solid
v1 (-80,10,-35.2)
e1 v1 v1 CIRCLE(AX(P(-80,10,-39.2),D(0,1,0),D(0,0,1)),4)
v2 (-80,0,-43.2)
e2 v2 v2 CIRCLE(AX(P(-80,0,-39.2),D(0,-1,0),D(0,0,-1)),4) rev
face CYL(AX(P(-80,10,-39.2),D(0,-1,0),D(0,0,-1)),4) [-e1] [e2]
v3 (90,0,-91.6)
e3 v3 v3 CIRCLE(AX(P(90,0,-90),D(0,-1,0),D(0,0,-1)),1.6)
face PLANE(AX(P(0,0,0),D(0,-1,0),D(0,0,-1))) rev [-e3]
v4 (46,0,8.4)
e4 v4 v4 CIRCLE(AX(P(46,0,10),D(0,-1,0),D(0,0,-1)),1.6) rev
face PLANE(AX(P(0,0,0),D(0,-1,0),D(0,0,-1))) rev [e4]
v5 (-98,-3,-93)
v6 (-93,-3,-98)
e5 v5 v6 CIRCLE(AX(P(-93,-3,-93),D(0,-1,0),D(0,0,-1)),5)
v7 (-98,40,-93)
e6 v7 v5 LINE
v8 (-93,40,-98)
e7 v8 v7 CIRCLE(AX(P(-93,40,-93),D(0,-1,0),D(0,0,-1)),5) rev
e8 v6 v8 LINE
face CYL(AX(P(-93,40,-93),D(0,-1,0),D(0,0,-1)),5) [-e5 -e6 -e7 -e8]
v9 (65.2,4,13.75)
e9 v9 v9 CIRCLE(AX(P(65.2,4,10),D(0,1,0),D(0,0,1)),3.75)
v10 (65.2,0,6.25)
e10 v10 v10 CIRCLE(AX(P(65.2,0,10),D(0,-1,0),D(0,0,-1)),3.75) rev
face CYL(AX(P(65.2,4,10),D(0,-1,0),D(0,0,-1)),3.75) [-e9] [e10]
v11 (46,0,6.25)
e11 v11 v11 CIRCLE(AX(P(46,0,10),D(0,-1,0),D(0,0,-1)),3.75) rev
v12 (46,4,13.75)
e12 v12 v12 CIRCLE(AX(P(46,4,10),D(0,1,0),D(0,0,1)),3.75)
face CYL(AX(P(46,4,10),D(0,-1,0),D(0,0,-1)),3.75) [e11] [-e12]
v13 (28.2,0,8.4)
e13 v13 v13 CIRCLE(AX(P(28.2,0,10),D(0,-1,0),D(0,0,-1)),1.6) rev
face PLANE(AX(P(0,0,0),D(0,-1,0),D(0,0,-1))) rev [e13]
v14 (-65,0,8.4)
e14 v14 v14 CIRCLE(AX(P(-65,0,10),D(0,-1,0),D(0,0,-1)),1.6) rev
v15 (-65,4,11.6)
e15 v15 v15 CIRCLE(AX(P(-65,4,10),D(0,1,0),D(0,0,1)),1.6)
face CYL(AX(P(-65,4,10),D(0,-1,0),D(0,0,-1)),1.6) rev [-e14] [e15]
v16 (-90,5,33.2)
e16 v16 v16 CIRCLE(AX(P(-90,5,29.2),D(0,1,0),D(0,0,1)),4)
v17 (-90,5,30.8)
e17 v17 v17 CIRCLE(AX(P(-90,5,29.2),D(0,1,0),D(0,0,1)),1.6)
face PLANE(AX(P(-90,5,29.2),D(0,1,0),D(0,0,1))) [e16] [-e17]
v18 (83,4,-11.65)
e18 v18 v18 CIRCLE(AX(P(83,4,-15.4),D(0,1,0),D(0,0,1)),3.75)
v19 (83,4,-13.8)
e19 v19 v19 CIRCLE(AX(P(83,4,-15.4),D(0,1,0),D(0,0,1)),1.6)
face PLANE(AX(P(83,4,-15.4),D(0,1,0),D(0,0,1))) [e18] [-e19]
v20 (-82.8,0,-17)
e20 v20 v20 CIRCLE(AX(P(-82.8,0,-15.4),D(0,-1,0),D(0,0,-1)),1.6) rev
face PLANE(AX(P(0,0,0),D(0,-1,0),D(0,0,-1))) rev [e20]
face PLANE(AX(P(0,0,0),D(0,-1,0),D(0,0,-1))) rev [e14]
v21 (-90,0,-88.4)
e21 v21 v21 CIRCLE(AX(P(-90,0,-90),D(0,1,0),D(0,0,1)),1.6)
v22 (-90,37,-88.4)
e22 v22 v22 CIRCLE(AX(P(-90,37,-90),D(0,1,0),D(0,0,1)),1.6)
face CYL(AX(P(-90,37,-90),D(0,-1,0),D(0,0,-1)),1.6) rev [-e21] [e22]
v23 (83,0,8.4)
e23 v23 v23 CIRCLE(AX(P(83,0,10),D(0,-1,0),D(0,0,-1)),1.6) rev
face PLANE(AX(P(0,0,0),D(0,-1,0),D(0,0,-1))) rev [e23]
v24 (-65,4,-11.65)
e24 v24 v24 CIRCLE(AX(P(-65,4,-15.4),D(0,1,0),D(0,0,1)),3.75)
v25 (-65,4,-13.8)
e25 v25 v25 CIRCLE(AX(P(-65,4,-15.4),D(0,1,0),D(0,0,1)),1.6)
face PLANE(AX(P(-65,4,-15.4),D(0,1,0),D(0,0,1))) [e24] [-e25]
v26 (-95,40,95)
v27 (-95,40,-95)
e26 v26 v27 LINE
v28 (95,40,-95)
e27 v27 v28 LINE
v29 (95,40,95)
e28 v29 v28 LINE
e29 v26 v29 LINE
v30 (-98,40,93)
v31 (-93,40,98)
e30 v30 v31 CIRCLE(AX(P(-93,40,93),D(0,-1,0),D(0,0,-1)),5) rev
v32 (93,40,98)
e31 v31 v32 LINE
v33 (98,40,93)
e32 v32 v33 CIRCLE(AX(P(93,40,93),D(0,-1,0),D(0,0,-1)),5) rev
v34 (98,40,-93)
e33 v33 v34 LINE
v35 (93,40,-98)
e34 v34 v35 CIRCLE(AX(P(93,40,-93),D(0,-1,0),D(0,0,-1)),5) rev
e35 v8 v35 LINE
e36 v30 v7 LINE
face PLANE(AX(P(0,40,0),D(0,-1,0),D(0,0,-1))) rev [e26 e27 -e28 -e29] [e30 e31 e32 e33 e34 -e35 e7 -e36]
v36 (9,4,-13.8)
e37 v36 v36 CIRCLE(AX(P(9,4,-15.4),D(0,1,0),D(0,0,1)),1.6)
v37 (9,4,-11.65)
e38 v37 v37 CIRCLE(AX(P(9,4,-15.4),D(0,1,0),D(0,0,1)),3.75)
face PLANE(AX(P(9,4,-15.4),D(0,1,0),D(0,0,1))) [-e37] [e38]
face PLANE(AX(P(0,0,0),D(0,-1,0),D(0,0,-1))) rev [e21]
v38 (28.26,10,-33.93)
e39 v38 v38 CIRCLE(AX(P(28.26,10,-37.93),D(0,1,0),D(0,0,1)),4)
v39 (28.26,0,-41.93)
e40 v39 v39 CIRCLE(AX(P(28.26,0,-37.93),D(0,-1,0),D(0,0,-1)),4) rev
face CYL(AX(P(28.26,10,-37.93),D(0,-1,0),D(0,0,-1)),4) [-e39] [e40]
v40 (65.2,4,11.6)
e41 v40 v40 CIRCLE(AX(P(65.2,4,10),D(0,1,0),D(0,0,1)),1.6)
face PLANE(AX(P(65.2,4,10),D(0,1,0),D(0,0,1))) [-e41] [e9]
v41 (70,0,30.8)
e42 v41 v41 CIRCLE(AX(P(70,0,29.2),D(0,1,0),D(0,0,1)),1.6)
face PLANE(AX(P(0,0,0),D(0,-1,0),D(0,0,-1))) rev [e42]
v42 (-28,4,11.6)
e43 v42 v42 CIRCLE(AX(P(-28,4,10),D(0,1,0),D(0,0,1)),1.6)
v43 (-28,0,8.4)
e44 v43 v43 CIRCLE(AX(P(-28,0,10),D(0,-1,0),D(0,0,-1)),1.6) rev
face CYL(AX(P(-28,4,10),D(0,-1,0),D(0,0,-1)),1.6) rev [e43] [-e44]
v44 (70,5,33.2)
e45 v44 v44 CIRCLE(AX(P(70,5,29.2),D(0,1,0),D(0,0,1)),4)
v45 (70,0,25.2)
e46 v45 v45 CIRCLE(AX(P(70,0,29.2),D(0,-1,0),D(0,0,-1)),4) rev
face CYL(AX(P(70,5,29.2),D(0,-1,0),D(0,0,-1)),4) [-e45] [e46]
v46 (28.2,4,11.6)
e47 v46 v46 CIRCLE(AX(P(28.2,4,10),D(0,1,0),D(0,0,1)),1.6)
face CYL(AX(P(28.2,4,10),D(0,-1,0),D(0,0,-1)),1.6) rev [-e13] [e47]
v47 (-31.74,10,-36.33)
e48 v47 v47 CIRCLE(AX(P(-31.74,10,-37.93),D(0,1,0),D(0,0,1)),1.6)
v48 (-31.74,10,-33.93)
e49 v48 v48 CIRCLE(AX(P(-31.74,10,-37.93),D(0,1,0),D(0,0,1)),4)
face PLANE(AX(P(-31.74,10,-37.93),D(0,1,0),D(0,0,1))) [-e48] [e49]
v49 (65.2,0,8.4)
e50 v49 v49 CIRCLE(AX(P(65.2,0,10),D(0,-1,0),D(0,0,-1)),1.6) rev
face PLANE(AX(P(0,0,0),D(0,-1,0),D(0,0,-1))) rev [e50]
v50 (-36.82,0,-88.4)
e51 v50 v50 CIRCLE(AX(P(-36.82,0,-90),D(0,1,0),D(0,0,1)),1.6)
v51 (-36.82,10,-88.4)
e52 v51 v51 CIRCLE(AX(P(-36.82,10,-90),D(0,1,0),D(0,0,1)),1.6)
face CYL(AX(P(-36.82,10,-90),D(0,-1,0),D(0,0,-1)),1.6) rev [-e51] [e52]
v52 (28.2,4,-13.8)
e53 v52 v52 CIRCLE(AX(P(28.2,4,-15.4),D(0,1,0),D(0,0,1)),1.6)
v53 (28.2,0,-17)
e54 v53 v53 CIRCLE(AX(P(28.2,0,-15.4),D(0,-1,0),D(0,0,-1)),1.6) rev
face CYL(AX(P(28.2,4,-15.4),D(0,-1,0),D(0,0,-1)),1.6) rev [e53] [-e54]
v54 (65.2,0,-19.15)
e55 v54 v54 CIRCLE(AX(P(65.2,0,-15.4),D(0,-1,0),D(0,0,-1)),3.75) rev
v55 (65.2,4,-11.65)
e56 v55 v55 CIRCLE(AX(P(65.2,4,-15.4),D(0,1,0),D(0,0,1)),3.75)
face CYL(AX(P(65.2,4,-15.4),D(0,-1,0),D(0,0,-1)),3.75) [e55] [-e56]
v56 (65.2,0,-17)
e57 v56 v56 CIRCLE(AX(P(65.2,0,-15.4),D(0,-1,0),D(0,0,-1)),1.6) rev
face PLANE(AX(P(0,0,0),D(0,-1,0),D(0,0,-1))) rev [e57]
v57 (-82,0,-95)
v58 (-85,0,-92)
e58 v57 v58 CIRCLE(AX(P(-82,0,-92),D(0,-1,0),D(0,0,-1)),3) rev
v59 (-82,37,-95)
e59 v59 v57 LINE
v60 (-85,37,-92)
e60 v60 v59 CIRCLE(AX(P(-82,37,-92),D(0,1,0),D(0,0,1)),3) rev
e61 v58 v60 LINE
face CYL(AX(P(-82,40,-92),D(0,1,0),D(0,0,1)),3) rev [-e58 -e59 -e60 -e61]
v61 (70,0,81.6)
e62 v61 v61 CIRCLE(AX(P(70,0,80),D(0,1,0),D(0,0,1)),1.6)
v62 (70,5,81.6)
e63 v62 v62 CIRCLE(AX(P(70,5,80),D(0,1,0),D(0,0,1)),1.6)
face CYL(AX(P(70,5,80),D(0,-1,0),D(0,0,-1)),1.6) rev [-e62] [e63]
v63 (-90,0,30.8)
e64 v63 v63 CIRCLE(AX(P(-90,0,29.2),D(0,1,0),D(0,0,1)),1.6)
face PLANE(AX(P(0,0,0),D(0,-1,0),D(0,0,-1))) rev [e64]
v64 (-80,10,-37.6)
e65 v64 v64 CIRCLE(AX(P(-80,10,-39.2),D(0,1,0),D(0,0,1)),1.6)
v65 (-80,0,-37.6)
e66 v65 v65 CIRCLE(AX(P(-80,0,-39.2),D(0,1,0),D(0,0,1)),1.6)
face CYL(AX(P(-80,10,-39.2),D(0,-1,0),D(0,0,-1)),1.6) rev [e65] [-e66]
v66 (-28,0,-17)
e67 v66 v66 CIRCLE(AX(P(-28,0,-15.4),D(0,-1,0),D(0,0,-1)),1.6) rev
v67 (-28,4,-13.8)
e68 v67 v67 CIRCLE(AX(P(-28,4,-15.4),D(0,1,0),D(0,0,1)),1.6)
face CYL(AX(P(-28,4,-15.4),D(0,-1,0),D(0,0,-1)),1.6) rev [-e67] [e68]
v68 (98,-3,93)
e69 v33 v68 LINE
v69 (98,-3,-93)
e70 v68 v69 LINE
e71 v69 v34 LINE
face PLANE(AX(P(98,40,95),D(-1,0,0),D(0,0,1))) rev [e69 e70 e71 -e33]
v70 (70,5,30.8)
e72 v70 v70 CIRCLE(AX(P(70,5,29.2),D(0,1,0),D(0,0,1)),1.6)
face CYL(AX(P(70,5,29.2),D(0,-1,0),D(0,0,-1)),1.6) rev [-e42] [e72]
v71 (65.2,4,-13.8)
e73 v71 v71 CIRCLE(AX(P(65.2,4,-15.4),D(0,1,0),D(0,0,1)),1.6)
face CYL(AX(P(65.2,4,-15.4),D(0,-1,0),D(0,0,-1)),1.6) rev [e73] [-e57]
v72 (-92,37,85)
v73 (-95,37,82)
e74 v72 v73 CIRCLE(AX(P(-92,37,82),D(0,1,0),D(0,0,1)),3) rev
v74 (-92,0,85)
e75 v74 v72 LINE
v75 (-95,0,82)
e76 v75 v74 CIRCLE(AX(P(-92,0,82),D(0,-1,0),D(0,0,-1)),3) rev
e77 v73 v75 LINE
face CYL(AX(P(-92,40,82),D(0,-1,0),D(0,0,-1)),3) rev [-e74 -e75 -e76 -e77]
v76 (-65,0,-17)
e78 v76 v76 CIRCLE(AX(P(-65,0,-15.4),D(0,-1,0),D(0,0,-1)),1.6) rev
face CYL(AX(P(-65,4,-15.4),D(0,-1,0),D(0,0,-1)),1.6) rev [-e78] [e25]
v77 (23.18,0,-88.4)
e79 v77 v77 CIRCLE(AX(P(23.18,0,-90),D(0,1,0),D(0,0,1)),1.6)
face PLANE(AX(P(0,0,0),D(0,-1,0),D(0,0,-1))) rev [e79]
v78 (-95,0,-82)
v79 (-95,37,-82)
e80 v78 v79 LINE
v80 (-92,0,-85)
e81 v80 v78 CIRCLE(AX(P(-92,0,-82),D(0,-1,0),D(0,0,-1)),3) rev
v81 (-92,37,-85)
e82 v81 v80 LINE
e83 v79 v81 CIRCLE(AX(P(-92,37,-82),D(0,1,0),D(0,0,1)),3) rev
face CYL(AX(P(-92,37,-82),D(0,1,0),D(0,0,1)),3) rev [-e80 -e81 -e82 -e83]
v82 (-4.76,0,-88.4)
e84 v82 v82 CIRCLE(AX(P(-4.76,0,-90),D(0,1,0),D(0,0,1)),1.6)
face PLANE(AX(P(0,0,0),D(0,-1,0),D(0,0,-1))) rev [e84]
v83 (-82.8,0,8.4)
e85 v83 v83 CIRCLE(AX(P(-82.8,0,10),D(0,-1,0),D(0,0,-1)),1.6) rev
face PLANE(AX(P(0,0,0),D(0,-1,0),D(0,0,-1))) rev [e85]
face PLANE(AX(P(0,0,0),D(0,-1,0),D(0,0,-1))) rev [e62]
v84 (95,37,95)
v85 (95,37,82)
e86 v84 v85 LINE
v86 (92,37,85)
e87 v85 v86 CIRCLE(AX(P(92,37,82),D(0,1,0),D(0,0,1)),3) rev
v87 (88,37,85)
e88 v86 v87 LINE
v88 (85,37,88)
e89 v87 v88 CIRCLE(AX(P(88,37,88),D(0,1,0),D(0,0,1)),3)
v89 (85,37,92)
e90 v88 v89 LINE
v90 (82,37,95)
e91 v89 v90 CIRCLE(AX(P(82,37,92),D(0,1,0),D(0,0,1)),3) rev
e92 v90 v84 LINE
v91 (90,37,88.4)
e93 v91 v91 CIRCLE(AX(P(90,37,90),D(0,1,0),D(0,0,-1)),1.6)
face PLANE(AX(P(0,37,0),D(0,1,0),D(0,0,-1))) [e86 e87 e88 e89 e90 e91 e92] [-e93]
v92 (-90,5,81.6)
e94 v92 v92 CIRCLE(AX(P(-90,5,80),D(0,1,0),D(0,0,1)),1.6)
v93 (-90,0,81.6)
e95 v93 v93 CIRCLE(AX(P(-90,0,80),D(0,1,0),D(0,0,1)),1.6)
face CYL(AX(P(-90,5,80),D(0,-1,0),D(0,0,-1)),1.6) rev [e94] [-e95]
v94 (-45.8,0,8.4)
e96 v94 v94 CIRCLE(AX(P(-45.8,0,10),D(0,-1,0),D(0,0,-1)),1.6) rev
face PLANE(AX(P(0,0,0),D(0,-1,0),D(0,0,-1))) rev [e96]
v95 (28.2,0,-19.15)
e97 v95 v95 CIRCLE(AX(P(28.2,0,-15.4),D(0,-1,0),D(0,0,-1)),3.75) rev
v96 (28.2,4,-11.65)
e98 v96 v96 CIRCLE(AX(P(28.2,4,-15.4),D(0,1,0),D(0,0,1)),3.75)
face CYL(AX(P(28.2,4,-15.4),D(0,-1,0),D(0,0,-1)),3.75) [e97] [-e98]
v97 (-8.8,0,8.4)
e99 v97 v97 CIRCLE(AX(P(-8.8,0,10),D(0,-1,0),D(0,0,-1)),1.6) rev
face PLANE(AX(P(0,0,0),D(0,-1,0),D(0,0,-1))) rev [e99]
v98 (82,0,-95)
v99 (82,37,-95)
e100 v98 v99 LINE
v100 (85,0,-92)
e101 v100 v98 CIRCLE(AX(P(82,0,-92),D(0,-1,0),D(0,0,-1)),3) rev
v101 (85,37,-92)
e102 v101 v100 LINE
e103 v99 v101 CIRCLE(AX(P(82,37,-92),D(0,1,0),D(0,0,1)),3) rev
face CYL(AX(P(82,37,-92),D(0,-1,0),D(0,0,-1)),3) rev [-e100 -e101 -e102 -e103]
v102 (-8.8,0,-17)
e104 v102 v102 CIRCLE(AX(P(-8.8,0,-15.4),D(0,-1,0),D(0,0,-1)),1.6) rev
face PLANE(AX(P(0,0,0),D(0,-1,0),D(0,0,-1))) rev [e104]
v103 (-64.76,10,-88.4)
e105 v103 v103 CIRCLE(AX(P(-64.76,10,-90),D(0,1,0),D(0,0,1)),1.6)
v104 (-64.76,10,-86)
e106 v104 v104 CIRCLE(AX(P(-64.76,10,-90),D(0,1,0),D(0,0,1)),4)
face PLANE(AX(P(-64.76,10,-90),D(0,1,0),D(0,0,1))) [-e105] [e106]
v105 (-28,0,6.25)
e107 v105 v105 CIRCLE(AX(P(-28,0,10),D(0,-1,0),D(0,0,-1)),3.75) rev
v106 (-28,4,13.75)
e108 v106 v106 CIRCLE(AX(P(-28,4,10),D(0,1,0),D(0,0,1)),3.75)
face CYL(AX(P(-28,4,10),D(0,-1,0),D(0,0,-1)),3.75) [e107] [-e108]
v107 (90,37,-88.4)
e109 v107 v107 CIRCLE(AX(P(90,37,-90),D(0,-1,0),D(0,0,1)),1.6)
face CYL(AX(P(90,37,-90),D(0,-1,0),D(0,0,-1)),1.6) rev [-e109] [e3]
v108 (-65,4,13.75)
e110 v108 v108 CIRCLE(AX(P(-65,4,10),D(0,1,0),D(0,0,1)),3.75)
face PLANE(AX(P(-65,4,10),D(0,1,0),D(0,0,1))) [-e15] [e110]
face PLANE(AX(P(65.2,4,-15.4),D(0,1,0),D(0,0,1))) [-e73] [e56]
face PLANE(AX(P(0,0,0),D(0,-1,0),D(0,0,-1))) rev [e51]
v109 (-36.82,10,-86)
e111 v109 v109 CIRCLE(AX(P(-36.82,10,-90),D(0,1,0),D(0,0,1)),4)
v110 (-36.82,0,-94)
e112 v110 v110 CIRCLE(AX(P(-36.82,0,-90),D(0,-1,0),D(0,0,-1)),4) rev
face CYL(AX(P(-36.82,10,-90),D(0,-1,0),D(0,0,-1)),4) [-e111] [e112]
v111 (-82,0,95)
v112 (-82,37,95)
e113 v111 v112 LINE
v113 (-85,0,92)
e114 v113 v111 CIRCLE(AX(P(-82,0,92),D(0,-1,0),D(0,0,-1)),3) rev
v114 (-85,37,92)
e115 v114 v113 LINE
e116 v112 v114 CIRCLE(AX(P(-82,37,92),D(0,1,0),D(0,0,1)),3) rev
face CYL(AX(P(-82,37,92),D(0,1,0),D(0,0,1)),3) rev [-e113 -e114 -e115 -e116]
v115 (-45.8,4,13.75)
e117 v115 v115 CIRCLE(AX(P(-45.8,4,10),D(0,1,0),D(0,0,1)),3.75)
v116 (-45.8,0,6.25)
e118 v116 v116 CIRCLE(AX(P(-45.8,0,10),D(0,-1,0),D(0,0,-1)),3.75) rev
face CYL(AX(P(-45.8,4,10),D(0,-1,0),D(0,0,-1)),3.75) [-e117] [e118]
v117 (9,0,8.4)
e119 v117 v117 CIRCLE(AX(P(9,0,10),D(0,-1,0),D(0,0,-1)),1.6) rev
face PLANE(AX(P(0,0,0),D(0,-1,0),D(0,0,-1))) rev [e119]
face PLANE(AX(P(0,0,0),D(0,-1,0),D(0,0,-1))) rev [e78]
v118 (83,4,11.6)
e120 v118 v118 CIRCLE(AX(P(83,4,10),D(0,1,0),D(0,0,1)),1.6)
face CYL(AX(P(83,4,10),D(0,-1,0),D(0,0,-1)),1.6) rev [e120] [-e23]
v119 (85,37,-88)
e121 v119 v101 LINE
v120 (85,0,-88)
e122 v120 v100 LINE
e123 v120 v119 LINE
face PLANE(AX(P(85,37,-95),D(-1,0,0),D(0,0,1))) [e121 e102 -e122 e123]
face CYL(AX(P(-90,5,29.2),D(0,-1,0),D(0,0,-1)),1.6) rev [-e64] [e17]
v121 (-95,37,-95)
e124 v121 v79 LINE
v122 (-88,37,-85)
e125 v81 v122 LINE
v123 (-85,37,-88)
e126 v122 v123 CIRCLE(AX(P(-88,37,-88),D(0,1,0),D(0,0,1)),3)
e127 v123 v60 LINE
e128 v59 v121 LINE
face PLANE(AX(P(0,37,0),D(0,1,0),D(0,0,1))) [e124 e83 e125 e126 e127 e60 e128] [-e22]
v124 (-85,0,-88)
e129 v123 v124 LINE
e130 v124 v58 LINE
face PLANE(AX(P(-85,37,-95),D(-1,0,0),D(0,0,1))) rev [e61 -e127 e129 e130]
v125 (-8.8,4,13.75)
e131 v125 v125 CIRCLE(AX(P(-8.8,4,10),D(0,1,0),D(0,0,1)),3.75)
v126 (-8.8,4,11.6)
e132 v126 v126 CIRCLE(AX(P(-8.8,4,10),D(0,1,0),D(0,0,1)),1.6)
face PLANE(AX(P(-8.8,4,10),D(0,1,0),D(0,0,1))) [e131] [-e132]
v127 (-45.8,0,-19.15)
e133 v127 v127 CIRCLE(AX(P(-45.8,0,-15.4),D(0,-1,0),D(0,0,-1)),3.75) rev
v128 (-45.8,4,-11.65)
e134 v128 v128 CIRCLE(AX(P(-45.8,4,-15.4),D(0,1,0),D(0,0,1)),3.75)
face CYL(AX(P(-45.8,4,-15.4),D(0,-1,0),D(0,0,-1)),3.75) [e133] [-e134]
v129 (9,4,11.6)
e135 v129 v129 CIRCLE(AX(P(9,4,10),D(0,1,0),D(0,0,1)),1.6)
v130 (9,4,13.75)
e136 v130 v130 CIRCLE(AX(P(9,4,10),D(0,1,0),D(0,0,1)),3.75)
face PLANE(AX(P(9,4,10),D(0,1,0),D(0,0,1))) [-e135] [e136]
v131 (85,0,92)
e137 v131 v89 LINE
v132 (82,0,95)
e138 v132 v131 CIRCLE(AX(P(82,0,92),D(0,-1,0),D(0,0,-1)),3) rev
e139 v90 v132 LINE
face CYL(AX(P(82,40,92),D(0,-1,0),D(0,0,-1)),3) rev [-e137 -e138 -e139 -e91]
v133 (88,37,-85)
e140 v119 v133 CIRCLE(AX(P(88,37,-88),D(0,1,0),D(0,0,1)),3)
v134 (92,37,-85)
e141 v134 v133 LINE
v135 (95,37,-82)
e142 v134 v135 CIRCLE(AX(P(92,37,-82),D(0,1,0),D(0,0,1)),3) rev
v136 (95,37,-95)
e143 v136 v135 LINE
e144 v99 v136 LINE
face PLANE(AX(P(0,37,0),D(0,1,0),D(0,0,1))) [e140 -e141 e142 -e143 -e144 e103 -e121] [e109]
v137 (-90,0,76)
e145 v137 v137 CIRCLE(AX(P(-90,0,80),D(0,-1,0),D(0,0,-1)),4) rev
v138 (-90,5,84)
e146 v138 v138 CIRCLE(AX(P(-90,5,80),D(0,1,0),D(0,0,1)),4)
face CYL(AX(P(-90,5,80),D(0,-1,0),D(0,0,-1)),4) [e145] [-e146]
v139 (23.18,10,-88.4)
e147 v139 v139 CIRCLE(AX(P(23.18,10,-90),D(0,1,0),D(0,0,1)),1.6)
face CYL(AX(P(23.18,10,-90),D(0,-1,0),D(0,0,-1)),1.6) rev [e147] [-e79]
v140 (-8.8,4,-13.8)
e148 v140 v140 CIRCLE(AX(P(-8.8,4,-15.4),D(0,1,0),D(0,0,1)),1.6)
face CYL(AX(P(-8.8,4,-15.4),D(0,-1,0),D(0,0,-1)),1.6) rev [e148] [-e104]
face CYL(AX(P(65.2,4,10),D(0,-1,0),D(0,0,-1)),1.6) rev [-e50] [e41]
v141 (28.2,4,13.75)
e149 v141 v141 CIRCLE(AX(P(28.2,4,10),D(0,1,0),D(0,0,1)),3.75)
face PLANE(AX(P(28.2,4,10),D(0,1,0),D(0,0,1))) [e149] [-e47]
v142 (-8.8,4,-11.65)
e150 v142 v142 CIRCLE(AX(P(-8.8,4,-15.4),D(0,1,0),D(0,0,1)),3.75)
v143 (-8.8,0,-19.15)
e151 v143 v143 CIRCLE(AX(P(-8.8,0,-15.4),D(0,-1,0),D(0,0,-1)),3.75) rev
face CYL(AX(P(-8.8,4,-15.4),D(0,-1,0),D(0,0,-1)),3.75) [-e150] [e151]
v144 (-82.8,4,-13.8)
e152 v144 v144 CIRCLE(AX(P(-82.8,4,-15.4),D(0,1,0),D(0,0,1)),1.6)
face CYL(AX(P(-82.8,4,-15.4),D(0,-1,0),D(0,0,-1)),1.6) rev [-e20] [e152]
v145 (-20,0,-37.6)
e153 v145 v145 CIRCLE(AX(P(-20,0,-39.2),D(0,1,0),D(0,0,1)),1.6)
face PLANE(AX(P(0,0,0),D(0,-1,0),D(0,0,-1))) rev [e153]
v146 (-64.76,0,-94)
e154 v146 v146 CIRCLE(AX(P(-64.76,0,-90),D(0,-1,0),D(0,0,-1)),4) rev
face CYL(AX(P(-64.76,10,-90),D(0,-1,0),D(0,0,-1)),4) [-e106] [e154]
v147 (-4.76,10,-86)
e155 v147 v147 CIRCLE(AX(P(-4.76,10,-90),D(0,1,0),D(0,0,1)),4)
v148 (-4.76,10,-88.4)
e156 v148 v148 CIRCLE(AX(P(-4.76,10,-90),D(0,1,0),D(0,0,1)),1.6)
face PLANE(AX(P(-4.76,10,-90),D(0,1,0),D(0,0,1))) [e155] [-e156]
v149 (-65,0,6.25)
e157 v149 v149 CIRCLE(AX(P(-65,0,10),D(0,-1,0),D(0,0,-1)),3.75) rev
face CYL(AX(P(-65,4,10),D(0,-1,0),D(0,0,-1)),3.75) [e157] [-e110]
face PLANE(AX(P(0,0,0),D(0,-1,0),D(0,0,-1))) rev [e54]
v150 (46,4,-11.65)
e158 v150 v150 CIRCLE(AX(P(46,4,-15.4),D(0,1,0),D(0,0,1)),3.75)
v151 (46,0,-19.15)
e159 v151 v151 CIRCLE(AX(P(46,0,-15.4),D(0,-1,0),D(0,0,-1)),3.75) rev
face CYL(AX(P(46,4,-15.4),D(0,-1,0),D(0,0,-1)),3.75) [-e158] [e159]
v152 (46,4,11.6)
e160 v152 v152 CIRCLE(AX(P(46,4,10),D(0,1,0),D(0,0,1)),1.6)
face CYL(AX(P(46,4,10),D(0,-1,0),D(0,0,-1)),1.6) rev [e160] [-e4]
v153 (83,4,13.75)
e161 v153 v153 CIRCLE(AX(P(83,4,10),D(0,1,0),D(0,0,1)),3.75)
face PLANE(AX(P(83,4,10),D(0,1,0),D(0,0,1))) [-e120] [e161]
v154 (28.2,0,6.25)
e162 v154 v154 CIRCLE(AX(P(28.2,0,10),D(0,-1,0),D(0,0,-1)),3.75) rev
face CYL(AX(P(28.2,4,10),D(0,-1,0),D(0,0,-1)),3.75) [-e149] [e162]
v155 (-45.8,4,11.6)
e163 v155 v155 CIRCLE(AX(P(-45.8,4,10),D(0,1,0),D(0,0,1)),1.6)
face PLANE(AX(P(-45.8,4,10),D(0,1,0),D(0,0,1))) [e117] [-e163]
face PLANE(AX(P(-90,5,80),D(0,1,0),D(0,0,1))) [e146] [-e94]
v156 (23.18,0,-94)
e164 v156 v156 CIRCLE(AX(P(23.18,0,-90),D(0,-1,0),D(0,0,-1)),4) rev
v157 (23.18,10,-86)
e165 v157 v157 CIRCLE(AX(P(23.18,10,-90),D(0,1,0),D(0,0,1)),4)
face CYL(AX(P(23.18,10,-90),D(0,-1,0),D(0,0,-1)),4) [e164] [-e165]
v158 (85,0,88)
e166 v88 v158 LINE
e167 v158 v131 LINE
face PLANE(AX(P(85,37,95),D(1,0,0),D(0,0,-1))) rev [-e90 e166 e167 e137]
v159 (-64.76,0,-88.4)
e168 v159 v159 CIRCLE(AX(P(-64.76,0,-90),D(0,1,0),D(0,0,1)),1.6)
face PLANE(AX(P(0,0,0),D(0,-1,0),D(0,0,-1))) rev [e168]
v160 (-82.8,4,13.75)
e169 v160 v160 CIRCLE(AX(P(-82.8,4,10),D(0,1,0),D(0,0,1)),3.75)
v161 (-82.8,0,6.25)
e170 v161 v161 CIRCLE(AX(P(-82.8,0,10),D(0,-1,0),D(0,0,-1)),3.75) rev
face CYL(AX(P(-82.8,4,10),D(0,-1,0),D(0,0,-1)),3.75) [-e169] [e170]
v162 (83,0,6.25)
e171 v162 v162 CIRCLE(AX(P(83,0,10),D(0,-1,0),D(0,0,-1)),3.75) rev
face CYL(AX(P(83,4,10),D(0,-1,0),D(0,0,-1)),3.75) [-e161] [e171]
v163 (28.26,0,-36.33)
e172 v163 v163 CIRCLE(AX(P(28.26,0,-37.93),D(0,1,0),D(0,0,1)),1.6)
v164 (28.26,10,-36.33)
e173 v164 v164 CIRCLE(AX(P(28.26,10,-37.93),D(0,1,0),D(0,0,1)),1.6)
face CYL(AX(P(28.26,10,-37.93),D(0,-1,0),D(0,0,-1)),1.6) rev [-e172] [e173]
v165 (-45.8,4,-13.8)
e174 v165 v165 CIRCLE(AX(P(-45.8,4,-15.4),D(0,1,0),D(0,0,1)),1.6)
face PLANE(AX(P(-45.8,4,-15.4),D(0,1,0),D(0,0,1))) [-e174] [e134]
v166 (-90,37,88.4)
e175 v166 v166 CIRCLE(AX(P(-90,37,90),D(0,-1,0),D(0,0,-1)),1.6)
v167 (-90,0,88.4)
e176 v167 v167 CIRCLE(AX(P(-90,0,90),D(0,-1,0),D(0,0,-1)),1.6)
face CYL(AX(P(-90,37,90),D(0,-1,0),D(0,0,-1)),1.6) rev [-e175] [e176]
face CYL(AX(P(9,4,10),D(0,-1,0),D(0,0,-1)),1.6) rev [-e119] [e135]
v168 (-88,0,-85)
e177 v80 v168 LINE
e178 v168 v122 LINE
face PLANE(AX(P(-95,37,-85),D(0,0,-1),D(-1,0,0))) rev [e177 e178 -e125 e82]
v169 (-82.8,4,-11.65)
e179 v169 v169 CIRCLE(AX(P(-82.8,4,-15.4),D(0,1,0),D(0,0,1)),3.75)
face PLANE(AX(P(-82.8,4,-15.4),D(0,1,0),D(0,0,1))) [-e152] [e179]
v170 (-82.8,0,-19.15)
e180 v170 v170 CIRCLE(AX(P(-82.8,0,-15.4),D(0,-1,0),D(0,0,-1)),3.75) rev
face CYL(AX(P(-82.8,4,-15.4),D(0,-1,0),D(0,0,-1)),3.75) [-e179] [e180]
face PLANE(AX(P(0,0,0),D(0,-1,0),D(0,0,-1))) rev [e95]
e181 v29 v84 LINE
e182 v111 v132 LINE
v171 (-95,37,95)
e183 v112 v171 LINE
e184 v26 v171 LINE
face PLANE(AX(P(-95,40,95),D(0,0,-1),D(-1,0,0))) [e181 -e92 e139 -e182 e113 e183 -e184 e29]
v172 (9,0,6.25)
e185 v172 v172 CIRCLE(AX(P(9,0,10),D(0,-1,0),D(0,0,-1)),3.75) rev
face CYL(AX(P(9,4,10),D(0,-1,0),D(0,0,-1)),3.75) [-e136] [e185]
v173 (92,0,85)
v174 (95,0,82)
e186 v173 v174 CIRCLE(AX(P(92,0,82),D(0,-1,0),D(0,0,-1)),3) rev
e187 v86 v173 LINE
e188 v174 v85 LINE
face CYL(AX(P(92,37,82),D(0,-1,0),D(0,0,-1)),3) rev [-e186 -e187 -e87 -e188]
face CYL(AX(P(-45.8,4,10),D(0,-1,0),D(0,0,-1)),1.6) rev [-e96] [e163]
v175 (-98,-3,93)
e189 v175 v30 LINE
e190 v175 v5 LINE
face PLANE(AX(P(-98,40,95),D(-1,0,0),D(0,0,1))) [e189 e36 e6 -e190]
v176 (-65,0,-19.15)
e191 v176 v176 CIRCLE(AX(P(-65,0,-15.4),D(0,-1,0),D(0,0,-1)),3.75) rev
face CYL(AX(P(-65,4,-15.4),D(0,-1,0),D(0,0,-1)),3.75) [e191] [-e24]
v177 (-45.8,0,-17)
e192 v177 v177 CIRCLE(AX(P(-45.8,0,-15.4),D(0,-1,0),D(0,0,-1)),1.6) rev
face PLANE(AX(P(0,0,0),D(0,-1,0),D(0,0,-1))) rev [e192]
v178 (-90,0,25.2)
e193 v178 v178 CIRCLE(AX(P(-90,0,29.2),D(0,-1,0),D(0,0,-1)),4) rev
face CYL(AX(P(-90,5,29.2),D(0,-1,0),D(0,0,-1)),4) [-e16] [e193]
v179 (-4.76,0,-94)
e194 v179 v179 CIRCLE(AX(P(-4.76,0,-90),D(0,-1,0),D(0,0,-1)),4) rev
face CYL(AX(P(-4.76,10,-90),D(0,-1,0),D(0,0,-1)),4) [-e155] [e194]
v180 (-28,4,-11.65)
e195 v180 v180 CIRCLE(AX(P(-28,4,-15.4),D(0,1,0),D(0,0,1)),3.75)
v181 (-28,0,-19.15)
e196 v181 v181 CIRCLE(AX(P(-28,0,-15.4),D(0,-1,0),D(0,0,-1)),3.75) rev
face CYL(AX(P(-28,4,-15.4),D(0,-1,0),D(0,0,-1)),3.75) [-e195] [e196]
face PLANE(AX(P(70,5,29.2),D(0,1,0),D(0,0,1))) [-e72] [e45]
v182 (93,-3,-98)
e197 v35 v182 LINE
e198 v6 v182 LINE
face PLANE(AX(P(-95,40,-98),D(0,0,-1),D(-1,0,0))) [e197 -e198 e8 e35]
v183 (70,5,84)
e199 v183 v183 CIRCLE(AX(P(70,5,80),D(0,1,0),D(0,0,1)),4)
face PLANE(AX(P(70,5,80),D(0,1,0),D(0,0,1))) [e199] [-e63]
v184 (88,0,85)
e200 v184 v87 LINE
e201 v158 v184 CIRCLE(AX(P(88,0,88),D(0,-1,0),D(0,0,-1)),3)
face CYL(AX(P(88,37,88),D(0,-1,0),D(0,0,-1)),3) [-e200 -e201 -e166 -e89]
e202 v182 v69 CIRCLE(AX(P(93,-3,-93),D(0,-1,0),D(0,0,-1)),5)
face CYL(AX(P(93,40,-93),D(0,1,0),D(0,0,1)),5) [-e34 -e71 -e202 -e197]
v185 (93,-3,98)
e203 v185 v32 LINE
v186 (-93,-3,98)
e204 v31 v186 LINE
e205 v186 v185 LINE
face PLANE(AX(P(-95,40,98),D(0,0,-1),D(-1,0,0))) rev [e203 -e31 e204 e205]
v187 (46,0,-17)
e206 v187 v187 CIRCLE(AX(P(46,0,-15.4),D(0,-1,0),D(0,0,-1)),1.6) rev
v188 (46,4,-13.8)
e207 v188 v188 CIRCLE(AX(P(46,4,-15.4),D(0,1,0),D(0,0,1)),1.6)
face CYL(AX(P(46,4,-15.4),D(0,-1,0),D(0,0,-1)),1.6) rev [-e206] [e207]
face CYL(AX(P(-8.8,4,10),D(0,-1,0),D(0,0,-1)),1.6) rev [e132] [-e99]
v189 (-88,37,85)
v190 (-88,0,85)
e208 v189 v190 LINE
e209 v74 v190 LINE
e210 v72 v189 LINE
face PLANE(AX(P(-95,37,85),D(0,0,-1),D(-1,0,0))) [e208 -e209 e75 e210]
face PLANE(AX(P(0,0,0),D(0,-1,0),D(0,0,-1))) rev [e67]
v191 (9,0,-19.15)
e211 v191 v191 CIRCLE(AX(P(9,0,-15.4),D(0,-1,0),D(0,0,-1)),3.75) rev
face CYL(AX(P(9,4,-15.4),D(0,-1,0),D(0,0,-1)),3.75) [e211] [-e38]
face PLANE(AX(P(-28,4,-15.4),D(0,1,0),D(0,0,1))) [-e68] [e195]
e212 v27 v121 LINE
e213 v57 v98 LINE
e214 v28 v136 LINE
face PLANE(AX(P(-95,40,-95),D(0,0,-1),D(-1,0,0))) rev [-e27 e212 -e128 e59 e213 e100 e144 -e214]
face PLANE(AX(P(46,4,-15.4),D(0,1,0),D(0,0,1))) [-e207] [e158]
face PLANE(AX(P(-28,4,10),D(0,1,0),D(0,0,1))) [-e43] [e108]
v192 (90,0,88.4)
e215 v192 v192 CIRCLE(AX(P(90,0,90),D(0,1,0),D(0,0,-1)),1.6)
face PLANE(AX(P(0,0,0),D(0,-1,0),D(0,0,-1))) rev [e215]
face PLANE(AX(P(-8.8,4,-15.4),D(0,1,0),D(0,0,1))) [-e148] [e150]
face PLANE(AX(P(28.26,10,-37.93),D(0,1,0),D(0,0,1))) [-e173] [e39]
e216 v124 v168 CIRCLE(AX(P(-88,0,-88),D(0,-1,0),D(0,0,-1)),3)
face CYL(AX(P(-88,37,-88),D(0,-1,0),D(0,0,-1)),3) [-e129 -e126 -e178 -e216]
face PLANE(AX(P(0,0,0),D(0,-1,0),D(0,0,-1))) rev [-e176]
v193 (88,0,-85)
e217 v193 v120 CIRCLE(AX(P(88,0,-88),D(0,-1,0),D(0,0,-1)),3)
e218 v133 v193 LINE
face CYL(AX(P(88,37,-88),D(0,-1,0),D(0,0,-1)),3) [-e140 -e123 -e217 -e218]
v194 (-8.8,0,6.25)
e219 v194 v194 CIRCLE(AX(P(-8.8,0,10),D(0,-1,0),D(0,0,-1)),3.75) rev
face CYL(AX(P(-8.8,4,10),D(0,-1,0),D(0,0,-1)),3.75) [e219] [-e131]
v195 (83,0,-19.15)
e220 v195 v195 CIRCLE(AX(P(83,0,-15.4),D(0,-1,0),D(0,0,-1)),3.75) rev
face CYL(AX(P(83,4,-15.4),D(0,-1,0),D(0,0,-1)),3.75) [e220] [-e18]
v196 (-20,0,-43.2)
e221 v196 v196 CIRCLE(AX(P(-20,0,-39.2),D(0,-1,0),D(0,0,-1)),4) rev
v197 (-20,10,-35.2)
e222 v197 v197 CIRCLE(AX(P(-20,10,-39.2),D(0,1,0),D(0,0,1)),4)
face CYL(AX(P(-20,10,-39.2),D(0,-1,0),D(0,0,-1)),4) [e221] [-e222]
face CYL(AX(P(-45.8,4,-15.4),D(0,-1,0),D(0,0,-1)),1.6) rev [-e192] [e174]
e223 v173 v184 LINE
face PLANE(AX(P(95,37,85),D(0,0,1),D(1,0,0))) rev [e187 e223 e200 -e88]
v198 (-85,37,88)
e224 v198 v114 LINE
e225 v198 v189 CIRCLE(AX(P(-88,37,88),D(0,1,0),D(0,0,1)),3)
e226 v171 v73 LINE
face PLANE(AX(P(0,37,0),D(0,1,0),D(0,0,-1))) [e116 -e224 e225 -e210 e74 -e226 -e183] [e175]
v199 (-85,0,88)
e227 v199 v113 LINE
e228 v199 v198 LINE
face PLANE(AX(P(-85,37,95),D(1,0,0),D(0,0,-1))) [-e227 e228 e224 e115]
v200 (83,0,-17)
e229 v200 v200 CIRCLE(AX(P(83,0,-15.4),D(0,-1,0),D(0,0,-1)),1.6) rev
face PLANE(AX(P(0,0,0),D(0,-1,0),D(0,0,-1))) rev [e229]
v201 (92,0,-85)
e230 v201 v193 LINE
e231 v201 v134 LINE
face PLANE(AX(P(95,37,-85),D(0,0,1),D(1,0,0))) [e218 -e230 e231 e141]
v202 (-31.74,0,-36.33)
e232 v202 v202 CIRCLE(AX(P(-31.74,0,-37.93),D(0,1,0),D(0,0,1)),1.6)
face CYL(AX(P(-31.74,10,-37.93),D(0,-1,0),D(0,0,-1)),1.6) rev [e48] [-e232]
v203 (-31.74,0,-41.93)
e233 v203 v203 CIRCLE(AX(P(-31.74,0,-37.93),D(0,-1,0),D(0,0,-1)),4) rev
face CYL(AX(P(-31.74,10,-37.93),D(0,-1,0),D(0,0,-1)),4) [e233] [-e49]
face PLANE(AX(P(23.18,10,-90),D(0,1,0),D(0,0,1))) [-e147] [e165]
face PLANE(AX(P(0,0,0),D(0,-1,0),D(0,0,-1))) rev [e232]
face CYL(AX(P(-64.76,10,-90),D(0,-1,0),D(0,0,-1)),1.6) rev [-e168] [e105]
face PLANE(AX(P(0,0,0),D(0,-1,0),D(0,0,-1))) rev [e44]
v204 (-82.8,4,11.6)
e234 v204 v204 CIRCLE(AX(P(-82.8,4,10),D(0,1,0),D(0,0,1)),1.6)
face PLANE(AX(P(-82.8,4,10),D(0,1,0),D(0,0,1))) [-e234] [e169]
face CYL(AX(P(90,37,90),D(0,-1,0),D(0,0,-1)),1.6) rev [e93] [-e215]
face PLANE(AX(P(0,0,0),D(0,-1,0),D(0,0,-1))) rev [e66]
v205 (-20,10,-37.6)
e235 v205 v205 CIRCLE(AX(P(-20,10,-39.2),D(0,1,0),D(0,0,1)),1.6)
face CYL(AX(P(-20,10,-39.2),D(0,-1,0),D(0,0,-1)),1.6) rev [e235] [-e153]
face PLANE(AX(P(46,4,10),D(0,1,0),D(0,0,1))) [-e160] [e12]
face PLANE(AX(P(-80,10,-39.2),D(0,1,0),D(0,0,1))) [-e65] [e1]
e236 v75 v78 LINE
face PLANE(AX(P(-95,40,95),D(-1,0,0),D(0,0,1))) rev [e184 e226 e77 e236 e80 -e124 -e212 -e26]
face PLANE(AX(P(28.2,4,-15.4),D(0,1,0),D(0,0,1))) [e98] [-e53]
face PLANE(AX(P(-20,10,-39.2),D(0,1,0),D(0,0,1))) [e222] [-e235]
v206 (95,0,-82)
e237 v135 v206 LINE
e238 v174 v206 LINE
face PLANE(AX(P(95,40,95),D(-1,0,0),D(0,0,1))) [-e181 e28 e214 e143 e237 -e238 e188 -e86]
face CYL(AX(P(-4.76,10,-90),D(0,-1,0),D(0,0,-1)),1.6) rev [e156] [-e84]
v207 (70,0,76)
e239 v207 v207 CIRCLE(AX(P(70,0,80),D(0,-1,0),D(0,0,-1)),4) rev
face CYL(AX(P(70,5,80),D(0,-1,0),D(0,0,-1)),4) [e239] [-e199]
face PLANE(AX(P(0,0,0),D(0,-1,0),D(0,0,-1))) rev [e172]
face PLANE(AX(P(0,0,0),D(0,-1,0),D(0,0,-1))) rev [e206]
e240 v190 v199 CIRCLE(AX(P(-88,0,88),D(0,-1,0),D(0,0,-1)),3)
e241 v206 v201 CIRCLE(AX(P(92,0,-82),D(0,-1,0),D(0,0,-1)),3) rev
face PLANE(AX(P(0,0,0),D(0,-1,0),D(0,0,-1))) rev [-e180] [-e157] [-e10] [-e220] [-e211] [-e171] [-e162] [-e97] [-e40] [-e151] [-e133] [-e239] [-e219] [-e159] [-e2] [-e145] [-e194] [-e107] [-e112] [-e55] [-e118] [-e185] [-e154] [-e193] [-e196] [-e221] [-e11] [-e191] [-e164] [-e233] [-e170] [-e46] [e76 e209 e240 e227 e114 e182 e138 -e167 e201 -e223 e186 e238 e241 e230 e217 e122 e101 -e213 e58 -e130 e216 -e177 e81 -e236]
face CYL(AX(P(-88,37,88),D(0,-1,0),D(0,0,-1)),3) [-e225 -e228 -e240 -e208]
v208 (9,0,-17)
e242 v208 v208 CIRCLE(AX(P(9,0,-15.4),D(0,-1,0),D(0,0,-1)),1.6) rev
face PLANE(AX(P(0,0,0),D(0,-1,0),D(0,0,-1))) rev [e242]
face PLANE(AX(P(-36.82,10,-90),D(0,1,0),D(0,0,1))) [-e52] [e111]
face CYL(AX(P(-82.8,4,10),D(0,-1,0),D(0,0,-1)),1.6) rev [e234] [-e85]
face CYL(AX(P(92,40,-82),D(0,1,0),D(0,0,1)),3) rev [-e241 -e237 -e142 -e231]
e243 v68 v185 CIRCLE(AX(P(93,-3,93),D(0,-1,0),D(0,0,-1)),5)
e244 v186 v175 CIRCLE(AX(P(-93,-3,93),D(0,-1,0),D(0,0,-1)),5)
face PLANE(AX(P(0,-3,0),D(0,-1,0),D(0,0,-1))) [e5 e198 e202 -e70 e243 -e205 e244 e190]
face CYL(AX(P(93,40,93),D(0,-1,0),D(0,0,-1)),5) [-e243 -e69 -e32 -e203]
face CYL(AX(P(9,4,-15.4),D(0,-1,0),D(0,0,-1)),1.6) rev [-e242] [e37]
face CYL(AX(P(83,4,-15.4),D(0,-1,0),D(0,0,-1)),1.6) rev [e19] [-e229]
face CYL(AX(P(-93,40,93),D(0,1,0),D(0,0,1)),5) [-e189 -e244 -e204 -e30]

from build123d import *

# Parameters (mm, degrees)
SKETCH1_W               = 190
SKETCH1_H               = 190
BOSS_EXTRUDE1_DEPTH     = 40
SHELL1_T                = 3
FILLET1_R               = 5
SKETCH5_W               = 10
SKETCH5_H               = 10
SKETCH5_R               = 1.6
BOSS_EXTRUDE3_DEPTH     = 37
MIRROR2_COPY_1_SKETCH_W = 10
MIRROR2_COPY_1_SKETCH_H = 10
MIRROR2_COPY_1_SKETCH_R = 1.6
MIRROR2_COPY_1_DEPTH    = 37
FILLET3_R               = 3
SKETCH6_R               = 3.75
SKETCH6_R_2             = 1.6
BOSS_EXTRUDE4_DEPTH     = 7
LPATTERN1_COUNT         = 5
LPATTERN1_PITCH         = 37
SKETCH7_R               = 4
SKETCH7_R_2             = 1.6
BOSS_EXTRUDE5_DEPTH     = 5
SKETCH8_R               = 4
SKETCH8_R_2             = 1.6
BOSS_EXTRUDE6_DEPTH     = 10
LPATTERN2_COUNT         = 2
LPATTERN2_PITCH         = 60


with BuildPart() as part:
    # Sketch1 → Boss-Extrude1 (new body)
    with BuildSketch(Plane(origin=(0, 0, 0), x_dir=(1, 0, 0), z_dir=(0, 1, 0))):
        Rectangle(SKETCH1_W, SKETCH1_H)
    extrude(amount=BOSS_EXTRUDE1_DEPTH)

    # Shell1
    shell1_openings = [part.faces().sort_by_distance(p)[0] for p in [
        (0, 40, 0),
    ]]
    offset(amount=SHELL1_T, openings=shell1_openings, kind=Kind.INTERSECTION)

    # Fillet1
    # the kernel refuses this fillet: 5 mm, written as the material it takes off along each edge
    with BuildSketch(Plane(origin=(-98, 52.5, 98), x_dir=(1, 0, 0), z_dir=(0, -1, 0)), Plane(origin=(98, -15.5, 98), x_dir=(-1, 0, 0), z_dir=(0, 1, 0)), Plane(origin=(98, -15.5, -98), x_dir=(0, 0, 1), z_dir=(0, 1, 0)), Plane(origin=(-98, -15.5, -98), x_dir=(1, 0, 0), z_dir=(0, 1, 0))) as fillet1_piece_1:
        with BuildLine():
            CenterArc((FILLET1_R, -FILLET1_R), FILLET1_R, 90, 90)
            Line((0, -FILLET1_R), (0, 0))
            Line((0, 0), (FILLET1_R, 0))
        make_face()
    extrude(amount=68, mode=Mode.SUBTRACT)

    # Sketch5 → Boss-Extrude3 (add)
    with BuildSketch(Plane(origin=(0, 0, 0), x_dir=(1, 0, 0), z_dir=(0, 1, 0))):
        with Locations((-90, 90)):
            Rectangle(SKETCH5_W, SKETCH5_H)
        with Locations(Location((-90, 90, 0), (0, 0, 270))):
            Circle(SKETCH5_R, mode=Mode.SUBTRACT)
    boss_extrude3 = extrude(amount=BOSS_EXTRUDE3_DEPTH)

    # Mirror1: Boss-Extrude3 across plane
    add(boss_extrude3.mirror(Plane(origin=(0, 0, 0), x_dir=(0, 0, 1), z_dir=(1, 0, 0))))

    # Mirror2: Boss-Extrude3 across plane
    add(boss_extrude3.mirror(Plane.XY))

    # Mirror2 copy 1 sketch → Mirror2 copy 1 (add)
    with BuildSketch(Plane(origin=(0, 0, 0), x_dir=(-1, 0, 0), z_dir=(0, 1, 0))):
        with Locations((-90, 90)):
            Rectangle(MIRROR2_COPY_1_SKETCH_W, MIRROR2_COPY_1_SKETCH_H)
        with Locations(Location((-90, 90, 0), (0, 0, 270))):
            Circle(MIRROR2_COPY_1_SKETCH_R, mode=Mode.SUBTRACT)
    extrude(amount=MIRROR2_COPY_1_DEPTH)

    # Fillet3
    fillet3_edges = [part.edges().sort_by_distance(p)[0] for p in [
        (-95, 18.5, 85),
        (-85, 18.5, 95),
        (-85, 18.5, 85),
        (-95, 18.5, -85),
        (-85, 18.5, -85),
        (-85, 18.5, -95),
        (95, 18.5, -85),
        (85, 18.5, -95),
        (85, 18.5, -85),
        (95, 18.5, 85),
        (85, 18.5, 85),
        (85, 18.5, 95),
    ]]
    fillet(fillet3_edges, radius=FILLET3_R)

    # Sketch6 → Boss-Extrude4 (add)
    # profile 1 of 4: a face of its own
    with BuildSketch(Plane(origin=(0, -3, 0), x_dir=(1, 0, 0), z_dir=(0, 1, 0))):
        with Locations(Location((-65, 15.4, 0), (0, 0, 90))):
            Circle(SKETCH6_R)
        with Locations(Location((-65, 15.4, 0), (0, 0, 90))):
            Circle(SKETCH6_R_2, mode=Mode.SUBTRACT)
    # profile 2 of 4: a face of its own
    with BuildSketch(Plane(origin=(0, -3, 0), x_dir=(1, 0, 0), z_dir=(0, 1, 0))):
        with Locations(Location((-65, -10, 0), (0, 0, 90))):
            Circle(SKETCH6_R)
        with Locations(Location((-65, -10, 0), (0, 0, 90))):
            Circle(SKETCH6_R_2, mode=Mode.SUBTRACT)
    # profile 3 of 4: a face of its own
    with BuildSketch(Plane(origin=(0, -3, 0), x_dir=(1, 0, 0), z_dir=(0, 1, 0))):
        with Locations(Location((-82.8, 15.4, 0), (0, 0, 90))):
            Circle(SKETCH6_R)
        with Locations(Location((-82.8, 15.4, 0), (0, 0, 90))):
            Circle(SKETCH6_R_2, mode=Mode.SUBTRACT)
    # profile 4 of 4: a face of its own
    with BuildSketch(Plane(origin=(0, -3, 0), x_dir=(1, 0, 0), z_dir=(0, 1, 0))):
        with Locations(Location((-82.8, -10, 0), (0, 0, 90))):
            Circle(SKETCH6_R)
        with Locations(Location((-82.8, -10, 0), (0, 0, 90))):
            Circle(SKETCH6_R_2, mode=Mode.SUBTRACT)
    boss_extrude4 = extrude(amount=BOSS_EXTRUDE4_DEPTH)

    # LPattern1: Boss-Extrude4 ×5
    with Locations(*[(i * LPATTERN1_PITCH, 0, 0) for i in range(1, LPATTERN1_COUNT)]):
        add(boss_extrude4)

    # Sketch7 → Boss-Extrude5 (add)
    # profile 1 of 4: a face of its own
    with BuildSketch(Plane(origin=(0, 0, 0), x_dir=(1, 0, 0), z_dir=(0, 1, 0))):
        with Locations(Location((-90, -29.2, 0), (0, 0, 90))):
            Circle(SKETCH7_R)
        with Locations(Location((-90, -29.2, 0), (0, 0, 270))):
            Circle(SKETCH7_R_2, mode=Mode.SUBTRACT)
    # profile 2 of 4: a face of its own
    with BuildSketch(Plane(origin=(0, 0, 0), x_dir=(1, 0, 0), z_dir=(0, 1, 0))):
        with Locations(Location((-90, -80, 0), (0, 0, 90))):
            Circle(SKETCH7_R)
        with Locations(Location((-90, -80, 0), (0, 0, 270))):
            Circle(SKETCH7_R_2, mode=Mode.SUBTRACT)
    # profile 3 of 4: a face of its own
    with BuildSketch(Plane(origin=(0, 0, 0), x_dir=(1, 0, 0), z_dir=(0, 1, 0))):
        with Locations(Location((70, -80, 0), (0, 0, 90))):
            Circle(SKETCH7_R)
        with Locations(Location((70, -80, 0), (0, 0, 270))):
            Circle(SKETCH7_R_2, mode=Mode.SUBTRACT)
    # profile 4 of 4: a face of its own
    with BuildSketch(Plane(origin=(0, 0, 0), x_dir=(1, 0, 0), z_dir=(0, 1, 0))):
        with Locations(Location((70, -29.2, 0), (0, 0, 90))):
            Circle(SKETCH7_R)
        with Locations(Location((70, -29.2, 0), (0, 0, 270))):
            Circle(SKETCH7_R_2, mode=Mode.SUBTRACT)
    extrude(amount=BOSS_EXTRUDE5_DEPTH)

    # Sketch8 → Boss-Extrude6 (add)
    # profile 1 of 4: a face of its own
    with BuildSketch(Plane(origin=(0, 0, 0), x_dir=(1, 0, 0), z_dir=(0, 1, 0))):
        with Locations(Location((-31.74, 37.93, 0), (0, 0, 90))):
            Circle(SKETCH8_R)
        with Locations(Location((-31.74, 37.93, 0), (0, 0, 270))):
            Circle(SKETCH8_R_2, mode=Mode.SUBTRACT)
    # profile 2 of 4: a face of its own
    with BuildSketch(Plane(origin=(0, 0, 0), x_dir=(1, 0, 0), z_dir=(0, 1, 0))):
        with Locations(Location((-36.82, 90, 0), (0, 0, 90))):
            Circle(SKETCH8_R)
        with Locations(Location((-36.82, 90, 0), (0, 0, 270))):
            Circle(SKETCH8_R_2, mode=Mode.SUBTRACT)
    # profile 3 of 4: a face of its own
    with BuildSketch(Plane(origin=(0, 0, 0), x_dir=(1, 0, 0), z_dir=(0, 1, 0))):
        with Locations(Location((-80, 39.2, 0), (0, 0, 90))):
            Circle(SKETCH8_R)
        with Locations(Location((-80, 39.2, 0), (0, 0, 270))):
            Circle(SKETCH8_R_2, mode=Mode.SUBTRACT)
    # profile 4 of 4: a face of its own
    with BuildSketch(Plane(origin=(0, 0, 0), x_dir=(1, 0, 0), z_dir=(0, 1, 0))):
        with Locations(Location((-64.76, 90, 0), (0, 0, 90))):
            Circle(SKETCH8_R)
        with Locations(Location((-64.76, 90, 0), (0, 0, 270))):
            Circle(SKETCH8_R_2, mode=Mode.SUBTRACT)
    boss_extrude6 = extrude(amount=BOSS_EXTRUDE6_DEPTH)

    # LPattern2: Boss-Extrude6 ×2
    with Locations(*[(i * LPATTERN2_PITCH, 0, 0) for i in range(1, LPATTERN2_COUNT)]):
        add(boss_extrude6)


solid = part.part
